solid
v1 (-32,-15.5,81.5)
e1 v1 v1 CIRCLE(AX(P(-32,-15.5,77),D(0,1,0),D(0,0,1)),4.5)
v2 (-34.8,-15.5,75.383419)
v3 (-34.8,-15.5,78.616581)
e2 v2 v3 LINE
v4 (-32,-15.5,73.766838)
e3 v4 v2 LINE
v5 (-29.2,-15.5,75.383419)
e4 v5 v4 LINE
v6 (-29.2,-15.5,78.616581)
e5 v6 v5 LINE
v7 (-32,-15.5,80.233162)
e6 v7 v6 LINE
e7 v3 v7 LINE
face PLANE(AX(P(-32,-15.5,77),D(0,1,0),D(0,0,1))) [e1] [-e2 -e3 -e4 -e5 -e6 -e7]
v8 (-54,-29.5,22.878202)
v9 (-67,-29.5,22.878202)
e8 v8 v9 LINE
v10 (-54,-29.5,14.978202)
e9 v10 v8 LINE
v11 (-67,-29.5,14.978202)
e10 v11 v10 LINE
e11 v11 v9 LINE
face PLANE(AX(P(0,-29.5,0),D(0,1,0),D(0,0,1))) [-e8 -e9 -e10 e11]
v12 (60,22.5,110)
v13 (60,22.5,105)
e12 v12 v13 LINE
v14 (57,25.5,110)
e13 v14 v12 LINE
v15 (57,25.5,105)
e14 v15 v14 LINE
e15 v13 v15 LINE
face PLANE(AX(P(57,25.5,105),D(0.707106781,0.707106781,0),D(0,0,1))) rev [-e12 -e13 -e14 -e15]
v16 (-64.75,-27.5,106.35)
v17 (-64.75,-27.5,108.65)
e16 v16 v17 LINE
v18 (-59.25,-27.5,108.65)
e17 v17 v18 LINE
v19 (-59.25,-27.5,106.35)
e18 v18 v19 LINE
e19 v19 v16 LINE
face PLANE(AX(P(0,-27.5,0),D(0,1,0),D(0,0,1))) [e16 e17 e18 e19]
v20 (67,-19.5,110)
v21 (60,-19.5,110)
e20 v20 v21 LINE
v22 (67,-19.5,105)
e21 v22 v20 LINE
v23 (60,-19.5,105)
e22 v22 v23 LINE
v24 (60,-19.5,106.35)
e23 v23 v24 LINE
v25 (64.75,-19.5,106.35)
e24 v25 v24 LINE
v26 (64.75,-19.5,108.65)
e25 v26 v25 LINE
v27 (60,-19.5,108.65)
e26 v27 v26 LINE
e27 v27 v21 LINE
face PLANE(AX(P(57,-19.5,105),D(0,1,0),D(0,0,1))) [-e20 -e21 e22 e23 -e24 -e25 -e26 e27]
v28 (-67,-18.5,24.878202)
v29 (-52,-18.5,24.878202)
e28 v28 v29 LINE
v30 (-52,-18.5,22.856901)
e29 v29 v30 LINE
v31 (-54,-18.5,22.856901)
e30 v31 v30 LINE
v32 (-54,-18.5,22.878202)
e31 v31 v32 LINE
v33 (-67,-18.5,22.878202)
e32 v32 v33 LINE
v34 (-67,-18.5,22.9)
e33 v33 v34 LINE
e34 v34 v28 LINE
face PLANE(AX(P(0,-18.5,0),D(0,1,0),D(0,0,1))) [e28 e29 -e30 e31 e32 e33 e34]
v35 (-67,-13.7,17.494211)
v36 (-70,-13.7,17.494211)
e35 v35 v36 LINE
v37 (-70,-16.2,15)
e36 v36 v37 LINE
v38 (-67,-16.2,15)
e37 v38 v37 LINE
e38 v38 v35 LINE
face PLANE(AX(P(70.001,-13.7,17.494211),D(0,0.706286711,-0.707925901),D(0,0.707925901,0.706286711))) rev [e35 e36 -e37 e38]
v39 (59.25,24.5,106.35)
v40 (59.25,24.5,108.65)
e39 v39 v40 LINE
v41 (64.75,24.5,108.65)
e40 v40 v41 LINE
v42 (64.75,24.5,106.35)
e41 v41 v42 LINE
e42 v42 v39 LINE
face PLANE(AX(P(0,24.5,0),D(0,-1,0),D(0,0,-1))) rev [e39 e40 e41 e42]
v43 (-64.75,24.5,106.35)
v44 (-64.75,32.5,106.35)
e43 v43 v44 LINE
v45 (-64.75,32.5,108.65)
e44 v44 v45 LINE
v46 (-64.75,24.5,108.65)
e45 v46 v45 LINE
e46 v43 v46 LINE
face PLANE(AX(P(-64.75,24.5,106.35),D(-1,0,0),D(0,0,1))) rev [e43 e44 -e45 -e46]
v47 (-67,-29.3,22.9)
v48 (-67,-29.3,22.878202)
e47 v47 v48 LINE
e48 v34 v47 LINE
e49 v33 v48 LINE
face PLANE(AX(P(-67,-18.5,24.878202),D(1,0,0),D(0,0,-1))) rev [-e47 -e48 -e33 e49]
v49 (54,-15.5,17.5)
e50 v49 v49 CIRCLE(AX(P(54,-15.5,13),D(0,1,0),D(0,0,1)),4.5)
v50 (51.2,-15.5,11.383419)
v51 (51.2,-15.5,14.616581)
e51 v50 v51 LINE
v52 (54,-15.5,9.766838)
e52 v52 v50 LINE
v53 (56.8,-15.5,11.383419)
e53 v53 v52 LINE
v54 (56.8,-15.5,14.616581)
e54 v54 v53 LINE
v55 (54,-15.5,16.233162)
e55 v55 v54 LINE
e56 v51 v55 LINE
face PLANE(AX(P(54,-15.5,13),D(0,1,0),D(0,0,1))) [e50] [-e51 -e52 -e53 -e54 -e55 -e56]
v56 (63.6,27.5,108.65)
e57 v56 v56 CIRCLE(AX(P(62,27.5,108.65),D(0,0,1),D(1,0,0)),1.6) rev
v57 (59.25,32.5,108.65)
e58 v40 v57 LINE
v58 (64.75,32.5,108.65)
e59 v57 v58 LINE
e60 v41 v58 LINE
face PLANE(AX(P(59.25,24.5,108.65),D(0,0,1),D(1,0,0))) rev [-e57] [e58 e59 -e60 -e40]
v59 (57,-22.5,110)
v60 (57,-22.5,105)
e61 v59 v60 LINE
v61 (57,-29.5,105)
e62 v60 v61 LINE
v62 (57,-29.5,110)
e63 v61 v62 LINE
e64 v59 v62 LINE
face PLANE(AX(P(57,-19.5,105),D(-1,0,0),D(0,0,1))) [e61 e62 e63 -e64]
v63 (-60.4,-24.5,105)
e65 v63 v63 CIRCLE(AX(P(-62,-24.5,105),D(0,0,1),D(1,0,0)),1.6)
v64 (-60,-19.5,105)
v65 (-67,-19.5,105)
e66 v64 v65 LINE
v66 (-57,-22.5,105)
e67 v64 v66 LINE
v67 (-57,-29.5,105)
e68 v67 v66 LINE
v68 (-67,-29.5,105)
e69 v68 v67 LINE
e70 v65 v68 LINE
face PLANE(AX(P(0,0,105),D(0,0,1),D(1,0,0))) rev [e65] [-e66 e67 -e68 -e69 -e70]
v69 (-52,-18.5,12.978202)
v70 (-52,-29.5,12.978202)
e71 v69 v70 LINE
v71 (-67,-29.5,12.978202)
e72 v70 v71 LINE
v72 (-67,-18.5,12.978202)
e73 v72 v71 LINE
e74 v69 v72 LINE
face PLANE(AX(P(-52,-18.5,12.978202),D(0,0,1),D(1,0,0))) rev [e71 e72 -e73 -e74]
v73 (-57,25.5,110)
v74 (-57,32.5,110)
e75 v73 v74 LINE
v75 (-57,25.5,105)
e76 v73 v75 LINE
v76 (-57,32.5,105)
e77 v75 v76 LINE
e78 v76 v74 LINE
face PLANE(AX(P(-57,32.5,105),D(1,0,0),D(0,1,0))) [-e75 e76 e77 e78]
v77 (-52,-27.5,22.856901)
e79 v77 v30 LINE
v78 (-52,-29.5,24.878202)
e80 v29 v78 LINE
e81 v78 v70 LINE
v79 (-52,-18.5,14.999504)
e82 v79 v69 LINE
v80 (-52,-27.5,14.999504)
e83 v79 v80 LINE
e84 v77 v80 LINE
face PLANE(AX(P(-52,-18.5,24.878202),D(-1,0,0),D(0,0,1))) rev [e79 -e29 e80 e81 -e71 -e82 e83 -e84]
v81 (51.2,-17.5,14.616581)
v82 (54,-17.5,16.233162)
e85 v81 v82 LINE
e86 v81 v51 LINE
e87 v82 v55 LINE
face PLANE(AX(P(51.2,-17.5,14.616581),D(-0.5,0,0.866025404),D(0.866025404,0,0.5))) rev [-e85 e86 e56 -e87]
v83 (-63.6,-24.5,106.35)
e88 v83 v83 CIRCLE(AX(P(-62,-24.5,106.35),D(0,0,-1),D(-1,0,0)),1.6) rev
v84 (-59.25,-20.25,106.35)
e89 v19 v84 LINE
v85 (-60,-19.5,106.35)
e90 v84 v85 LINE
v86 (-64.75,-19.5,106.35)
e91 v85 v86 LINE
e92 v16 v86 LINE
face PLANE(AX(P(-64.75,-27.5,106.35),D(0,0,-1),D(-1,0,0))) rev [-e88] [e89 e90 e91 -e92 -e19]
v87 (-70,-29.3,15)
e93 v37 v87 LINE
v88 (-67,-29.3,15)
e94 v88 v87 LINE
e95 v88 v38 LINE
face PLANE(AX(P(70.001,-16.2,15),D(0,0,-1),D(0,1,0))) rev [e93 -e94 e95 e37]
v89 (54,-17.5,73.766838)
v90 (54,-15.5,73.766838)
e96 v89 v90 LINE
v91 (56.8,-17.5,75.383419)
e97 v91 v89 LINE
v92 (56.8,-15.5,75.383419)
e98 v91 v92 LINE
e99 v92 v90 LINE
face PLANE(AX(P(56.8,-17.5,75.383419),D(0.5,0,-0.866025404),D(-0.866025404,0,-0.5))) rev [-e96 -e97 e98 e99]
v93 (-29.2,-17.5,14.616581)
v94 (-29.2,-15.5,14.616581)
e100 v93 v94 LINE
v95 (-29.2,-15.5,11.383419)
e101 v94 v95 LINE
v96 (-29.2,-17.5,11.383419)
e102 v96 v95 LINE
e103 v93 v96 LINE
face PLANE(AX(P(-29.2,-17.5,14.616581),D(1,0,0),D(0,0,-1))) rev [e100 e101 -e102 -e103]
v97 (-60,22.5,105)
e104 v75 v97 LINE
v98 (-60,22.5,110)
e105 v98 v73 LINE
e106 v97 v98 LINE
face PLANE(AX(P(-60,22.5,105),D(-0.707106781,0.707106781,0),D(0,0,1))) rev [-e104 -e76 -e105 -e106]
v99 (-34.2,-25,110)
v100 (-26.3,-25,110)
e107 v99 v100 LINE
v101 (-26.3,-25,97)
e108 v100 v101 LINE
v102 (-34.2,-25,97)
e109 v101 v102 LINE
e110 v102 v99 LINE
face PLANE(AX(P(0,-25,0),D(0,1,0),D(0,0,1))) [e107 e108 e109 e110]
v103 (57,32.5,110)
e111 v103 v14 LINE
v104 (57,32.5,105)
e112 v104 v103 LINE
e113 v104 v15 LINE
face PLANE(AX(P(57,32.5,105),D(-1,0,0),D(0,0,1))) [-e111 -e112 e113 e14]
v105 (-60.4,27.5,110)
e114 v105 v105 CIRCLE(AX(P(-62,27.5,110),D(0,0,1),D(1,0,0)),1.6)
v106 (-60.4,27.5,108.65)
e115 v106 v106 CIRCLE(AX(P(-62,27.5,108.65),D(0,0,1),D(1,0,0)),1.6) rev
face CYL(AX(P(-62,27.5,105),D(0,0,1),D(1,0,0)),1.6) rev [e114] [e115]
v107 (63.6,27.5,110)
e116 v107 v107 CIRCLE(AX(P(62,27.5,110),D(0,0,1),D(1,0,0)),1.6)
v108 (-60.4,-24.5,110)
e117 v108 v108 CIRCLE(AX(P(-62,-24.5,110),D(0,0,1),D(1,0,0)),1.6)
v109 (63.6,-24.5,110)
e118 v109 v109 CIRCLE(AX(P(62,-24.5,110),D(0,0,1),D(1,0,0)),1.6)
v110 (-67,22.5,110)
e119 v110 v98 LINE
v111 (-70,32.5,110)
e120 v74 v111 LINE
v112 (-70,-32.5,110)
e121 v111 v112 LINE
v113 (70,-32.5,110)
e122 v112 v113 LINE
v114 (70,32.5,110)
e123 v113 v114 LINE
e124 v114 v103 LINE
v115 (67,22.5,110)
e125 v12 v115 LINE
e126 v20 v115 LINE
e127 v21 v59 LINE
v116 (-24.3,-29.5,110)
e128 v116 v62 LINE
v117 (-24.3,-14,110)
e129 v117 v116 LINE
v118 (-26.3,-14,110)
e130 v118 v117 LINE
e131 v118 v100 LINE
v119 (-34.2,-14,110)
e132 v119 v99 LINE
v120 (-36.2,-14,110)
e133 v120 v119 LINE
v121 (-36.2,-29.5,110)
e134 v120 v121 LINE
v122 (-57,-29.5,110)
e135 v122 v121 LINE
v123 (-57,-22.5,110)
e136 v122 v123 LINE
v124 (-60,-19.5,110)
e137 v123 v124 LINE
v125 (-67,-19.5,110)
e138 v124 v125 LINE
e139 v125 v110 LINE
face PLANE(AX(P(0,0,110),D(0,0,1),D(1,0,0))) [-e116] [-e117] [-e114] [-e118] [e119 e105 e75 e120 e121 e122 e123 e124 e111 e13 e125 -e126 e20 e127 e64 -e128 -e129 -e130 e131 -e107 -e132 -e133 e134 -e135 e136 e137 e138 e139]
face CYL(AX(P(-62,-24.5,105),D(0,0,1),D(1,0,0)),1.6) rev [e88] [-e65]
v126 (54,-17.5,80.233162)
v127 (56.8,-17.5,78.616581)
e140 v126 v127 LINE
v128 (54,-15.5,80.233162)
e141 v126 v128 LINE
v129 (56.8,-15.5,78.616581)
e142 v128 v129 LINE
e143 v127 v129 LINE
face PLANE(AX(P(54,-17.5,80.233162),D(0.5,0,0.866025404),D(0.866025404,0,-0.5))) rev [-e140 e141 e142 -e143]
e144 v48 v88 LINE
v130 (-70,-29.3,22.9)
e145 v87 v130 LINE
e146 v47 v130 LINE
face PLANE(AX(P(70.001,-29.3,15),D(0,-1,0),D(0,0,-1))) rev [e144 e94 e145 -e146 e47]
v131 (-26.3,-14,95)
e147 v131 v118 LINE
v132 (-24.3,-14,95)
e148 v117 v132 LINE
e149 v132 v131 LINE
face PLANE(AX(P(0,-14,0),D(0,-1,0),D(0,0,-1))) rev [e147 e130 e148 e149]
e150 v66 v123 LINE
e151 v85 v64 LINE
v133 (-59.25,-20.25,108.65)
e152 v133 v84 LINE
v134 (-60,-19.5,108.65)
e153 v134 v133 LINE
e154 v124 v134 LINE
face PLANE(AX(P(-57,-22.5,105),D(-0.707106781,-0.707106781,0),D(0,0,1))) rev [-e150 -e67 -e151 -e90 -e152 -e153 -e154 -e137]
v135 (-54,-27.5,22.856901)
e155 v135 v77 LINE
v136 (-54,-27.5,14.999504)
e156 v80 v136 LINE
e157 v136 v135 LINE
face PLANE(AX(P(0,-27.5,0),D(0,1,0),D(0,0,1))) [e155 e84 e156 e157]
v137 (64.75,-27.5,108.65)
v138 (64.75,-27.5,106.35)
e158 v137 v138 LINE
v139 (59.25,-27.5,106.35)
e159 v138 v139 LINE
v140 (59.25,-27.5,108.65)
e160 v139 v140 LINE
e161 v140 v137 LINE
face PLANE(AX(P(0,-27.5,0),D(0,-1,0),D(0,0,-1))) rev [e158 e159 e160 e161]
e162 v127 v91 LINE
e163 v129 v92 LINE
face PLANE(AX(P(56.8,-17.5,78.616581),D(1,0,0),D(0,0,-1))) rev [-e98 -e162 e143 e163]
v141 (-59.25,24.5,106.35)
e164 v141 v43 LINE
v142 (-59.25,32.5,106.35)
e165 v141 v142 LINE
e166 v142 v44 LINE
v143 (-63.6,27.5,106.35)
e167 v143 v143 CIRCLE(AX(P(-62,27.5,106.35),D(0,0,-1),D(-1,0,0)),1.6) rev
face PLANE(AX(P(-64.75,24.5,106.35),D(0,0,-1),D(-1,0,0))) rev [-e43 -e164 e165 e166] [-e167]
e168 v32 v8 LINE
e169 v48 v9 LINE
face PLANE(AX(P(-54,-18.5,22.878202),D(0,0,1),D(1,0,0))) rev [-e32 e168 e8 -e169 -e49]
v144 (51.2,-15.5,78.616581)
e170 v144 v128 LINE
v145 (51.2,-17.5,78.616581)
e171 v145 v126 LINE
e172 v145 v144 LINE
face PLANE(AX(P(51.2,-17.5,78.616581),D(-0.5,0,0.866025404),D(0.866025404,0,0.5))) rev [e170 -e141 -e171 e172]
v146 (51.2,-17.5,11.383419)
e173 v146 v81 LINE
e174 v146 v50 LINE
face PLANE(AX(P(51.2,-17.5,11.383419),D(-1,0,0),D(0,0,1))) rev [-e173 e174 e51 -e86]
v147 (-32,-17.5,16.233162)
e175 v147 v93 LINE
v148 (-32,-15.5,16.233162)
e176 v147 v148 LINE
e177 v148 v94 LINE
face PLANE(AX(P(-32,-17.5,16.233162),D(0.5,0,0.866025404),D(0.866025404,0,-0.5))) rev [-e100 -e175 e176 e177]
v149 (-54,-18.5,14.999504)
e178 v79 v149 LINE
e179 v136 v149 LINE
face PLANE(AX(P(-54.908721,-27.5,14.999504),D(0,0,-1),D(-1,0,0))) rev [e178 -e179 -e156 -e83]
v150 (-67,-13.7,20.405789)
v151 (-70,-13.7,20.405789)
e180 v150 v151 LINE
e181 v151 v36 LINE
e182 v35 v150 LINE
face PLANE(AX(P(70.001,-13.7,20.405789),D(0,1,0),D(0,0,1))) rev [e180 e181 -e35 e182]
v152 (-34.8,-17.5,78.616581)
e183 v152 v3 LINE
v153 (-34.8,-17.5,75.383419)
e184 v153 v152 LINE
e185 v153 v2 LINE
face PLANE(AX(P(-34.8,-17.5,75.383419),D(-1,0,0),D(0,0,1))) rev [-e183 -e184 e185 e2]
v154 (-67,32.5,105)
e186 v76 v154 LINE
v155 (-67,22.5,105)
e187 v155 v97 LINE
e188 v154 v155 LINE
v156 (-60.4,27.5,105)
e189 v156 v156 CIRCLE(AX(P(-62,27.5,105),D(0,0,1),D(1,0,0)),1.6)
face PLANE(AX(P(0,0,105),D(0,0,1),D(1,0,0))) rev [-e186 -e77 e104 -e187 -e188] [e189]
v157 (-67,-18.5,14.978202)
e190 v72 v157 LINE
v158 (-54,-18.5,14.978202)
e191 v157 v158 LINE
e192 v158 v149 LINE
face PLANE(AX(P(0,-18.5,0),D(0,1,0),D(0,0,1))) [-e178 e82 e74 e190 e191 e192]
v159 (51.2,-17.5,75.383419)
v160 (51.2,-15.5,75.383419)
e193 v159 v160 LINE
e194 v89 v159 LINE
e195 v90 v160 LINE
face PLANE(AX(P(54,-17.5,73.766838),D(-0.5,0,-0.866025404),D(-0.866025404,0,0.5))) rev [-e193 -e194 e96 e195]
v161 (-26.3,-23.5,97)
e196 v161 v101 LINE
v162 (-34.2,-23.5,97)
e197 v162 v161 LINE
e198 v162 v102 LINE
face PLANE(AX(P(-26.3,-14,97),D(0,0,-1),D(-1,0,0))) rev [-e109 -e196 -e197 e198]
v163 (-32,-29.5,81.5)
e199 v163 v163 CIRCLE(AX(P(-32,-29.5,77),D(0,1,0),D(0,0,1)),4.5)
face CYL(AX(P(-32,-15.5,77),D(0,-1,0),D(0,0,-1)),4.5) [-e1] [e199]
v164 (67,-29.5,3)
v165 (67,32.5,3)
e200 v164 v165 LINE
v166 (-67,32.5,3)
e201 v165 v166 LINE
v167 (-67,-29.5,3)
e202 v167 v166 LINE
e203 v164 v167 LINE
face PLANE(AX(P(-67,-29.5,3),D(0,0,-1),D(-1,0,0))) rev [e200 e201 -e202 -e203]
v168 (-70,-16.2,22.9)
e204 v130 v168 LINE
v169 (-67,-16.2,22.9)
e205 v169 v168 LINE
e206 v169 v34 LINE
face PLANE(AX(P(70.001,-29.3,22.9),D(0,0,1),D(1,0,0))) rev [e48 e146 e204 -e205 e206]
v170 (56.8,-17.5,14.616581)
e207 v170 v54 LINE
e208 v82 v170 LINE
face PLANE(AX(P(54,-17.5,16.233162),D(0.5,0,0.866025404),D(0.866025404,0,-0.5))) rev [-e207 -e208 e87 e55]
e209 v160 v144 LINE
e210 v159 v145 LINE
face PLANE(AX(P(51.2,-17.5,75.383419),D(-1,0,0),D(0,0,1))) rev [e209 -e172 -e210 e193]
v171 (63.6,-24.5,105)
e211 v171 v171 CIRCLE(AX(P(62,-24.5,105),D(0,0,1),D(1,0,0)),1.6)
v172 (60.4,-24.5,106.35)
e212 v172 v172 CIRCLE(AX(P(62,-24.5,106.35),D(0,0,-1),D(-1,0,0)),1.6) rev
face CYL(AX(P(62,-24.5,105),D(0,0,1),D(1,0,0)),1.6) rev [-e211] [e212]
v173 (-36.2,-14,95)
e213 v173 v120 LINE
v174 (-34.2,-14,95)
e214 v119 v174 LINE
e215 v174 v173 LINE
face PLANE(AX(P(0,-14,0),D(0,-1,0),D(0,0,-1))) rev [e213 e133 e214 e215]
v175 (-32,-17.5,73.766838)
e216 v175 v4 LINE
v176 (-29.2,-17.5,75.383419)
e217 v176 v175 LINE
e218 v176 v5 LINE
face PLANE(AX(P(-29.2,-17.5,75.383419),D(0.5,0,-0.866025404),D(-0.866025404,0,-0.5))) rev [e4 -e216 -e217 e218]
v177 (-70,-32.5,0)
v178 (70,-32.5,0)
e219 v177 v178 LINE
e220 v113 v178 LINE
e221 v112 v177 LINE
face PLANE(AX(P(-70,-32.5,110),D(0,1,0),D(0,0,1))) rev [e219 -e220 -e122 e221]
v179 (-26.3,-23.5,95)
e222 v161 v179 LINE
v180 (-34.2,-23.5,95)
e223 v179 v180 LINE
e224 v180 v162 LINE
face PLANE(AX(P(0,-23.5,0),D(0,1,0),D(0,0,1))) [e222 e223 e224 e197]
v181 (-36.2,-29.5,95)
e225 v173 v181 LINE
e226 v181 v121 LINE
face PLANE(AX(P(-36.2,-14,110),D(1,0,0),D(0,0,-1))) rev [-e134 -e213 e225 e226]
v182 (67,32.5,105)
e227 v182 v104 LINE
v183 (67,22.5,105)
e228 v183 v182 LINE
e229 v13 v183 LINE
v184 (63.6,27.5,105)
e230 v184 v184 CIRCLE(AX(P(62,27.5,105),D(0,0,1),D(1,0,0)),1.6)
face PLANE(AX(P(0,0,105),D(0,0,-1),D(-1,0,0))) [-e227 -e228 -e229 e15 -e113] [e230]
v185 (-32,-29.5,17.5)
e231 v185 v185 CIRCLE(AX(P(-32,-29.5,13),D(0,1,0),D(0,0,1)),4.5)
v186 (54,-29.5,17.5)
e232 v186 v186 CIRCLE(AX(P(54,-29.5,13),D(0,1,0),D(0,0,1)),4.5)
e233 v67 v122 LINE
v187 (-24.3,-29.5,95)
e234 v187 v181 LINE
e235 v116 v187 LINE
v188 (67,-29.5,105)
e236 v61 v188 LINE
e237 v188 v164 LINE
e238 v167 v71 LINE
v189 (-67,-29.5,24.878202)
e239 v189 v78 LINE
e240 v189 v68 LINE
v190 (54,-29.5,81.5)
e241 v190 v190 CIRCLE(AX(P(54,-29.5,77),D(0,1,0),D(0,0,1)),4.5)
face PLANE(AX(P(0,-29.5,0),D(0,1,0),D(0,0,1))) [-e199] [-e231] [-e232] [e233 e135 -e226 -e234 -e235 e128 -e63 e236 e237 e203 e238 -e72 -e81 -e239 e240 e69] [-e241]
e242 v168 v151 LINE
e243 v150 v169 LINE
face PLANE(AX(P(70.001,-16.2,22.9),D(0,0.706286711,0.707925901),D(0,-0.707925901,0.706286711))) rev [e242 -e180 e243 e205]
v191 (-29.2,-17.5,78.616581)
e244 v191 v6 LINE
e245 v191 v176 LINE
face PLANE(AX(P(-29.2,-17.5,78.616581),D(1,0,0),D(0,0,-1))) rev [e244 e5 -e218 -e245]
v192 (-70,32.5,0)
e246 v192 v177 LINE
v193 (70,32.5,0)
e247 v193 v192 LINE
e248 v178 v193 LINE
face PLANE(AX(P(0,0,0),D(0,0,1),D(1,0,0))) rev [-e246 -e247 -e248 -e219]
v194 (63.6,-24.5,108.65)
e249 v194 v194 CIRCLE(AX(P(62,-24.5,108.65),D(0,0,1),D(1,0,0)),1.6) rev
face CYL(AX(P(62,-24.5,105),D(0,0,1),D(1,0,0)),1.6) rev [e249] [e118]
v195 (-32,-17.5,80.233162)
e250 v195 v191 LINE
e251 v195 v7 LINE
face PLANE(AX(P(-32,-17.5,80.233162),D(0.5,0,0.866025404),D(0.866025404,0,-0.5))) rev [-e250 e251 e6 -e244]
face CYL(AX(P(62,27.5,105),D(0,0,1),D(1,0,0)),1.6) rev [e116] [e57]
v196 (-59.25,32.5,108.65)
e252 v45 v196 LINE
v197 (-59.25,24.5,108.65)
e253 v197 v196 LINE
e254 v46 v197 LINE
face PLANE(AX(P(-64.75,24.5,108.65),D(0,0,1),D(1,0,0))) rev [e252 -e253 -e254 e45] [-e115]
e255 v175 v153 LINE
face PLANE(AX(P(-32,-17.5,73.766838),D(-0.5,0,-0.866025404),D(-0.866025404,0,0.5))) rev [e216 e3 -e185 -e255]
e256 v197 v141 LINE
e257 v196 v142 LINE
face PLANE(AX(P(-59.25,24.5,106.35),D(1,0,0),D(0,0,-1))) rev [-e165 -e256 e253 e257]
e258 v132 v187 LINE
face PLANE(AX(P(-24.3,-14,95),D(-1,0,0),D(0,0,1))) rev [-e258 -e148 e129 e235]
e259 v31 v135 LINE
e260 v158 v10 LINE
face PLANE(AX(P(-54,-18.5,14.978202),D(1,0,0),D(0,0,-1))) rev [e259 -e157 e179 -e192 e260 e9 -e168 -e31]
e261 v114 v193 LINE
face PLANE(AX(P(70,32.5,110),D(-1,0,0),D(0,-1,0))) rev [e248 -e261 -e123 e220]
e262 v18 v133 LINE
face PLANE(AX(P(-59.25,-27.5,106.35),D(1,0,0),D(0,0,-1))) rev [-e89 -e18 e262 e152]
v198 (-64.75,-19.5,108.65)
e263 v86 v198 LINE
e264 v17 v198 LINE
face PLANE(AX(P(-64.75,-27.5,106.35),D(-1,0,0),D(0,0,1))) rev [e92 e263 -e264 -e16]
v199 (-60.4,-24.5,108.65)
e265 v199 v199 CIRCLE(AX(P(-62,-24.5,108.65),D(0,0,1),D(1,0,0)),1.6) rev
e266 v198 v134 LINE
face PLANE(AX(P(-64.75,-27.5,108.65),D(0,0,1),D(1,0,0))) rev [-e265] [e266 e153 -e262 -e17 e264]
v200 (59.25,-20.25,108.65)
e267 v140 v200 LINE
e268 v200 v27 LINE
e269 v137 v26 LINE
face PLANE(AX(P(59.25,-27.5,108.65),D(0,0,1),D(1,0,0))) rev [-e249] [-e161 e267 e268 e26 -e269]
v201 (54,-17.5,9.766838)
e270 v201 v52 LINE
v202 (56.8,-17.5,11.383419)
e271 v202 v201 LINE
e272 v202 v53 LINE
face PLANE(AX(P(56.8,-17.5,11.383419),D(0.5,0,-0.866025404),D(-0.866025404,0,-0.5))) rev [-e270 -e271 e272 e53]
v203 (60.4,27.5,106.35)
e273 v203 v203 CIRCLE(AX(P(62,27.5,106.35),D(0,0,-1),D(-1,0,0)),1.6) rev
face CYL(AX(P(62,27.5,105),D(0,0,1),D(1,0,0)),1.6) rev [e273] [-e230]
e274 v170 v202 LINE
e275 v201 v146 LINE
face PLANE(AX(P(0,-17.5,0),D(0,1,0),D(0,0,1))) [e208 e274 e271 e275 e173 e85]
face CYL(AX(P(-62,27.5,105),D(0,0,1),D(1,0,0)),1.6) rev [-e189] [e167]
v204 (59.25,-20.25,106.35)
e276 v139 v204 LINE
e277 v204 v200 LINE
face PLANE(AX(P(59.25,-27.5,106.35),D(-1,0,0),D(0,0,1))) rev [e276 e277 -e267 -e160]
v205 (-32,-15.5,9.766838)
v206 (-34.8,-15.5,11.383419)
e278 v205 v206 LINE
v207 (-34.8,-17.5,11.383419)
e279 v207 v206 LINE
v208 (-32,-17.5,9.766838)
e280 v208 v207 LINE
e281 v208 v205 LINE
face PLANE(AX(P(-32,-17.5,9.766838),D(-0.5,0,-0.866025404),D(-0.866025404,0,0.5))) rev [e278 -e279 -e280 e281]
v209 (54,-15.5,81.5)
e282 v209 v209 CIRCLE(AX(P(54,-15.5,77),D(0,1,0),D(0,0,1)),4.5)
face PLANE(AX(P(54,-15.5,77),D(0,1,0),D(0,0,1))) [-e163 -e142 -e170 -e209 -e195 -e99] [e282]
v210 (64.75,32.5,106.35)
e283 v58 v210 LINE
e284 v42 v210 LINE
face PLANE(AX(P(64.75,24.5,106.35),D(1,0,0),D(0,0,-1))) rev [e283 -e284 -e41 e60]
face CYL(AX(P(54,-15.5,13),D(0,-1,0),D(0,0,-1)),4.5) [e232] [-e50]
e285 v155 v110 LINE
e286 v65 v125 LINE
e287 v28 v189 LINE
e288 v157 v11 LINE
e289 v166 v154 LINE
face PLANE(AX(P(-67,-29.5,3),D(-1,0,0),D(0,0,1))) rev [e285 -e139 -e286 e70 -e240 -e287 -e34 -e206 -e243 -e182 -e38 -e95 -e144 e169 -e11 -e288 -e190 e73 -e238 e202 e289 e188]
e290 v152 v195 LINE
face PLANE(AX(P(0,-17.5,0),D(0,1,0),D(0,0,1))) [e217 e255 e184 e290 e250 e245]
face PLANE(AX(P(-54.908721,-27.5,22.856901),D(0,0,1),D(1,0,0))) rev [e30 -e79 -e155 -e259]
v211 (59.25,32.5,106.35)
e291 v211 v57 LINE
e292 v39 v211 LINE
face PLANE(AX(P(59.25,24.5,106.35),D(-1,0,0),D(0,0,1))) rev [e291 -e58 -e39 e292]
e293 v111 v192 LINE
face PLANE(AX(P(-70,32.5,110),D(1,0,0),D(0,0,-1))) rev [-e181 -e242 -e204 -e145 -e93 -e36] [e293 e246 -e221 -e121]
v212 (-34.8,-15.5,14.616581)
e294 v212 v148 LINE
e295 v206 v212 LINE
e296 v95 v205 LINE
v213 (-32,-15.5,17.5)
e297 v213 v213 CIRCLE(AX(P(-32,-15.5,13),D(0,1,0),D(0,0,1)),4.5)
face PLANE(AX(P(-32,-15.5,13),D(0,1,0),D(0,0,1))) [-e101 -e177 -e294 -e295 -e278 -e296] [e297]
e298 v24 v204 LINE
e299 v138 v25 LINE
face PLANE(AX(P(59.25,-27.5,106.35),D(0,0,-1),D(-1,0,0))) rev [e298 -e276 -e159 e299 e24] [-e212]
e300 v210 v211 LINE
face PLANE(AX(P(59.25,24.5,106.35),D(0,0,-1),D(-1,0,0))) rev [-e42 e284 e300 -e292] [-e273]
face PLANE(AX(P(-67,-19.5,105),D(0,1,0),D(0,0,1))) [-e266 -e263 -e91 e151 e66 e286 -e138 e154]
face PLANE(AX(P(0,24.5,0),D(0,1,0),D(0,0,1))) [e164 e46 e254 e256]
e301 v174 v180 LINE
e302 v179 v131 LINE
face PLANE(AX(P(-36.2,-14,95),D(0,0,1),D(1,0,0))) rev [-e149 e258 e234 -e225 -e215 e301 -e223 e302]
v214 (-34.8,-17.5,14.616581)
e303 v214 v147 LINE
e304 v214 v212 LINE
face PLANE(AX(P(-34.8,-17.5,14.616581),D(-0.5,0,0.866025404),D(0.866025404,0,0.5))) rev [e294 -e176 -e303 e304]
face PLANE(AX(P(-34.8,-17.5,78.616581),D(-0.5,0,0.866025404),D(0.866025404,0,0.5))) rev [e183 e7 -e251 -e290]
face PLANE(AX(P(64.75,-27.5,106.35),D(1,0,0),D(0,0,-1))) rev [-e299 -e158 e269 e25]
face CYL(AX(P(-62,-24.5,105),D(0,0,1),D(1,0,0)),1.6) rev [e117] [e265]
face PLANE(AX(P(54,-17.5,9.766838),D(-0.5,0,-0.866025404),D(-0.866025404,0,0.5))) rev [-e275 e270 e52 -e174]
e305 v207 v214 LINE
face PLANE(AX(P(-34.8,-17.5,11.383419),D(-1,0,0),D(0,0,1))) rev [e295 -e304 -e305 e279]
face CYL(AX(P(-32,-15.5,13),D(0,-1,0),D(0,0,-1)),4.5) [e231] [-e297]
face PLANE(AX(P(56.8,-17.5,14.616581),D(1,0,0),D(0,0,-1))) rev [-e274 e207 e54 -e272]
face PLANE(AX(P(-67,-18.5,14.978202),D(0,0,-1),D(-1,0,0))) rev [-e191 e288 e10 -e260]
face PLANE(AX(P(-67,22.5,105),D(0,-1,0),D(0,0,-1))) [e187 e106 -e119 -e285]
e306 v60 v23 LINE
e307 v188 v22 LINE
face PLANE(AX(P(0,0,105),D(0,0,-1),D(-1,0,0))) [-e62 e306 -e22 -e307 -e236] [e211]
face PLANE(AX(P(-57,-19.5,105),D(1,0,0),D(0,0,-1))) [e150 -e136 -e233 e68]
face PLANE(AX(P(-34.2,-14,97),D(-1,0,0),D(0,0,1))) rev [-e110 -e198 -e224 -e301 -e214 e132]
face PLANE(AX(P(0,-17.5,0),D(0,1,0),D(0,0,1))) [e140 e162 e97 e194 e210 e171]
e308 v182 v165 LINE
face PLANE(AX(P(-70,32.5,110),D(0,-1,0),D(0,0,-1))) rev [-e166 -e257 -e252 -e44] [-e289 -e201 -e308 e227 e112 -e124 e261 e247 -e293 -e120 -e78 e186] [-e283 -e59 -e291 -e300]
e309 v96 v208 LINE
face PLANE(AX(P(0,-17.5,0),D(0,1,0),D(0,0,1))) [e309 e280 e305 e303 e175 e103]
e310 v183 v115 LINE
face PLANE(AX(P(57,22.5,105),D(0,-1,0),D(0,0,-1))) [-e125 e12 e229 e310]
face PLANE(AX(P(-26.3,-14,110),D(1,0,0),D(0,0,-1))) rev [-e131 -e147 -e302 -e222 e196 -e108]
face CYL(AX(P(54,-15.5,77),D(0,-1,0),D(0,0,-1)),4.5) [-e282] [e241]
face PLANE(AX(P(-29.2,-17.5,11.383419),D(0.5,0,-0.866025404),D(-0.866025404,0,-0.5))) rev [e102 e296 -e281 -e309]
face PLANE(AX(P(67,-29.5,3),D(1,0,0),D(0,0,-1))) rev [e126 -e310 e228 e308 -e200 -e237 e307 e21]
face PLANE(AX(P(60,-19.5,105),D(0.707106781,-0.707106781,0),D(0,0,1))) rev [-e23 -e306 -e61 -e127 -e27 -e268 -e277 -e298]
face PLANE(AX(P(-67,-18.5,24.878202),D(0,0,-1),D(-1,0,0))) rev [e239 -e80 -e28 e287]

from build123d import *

# Parameters (mm, degrees)
SKETCH_2_W          = 140
SKETCH_2_H          = 65
EXTRUDE_1_DEPTH     = 110
SKETCH_3_W          = 134
SKETCH_3_H          = 107
CUT_EXTRUDE_1_DEPTH = 62
SKETCH_4_W          = 10
SKETCH_4_H          = 10
SKETCH_4_R          = 1.6
EXTRUDE_2_DEPTH     = 5
SKETCH_5_W          = 10
SKETCH_5_H          = 10
SKETCH_5_R          = 1.6
EXTRUDE_3_DEPTH     = 5
SKETCH_6_W          = 5.5
SKETCH_6_H          = 2.3
CUT_EXTRUDE_2_DEPTH = 8
SKETCH_8_W          = 5.5
SKETCH_8_H          = 2.3
CUT_EXTRUDE_3_DEPTH = 8
CHAMFER_1_SIZE      = 3
SKETCH_9_R          = 4.5
EXTRUDE_4_DEPTH     = 14
CUT_EXTRUDE_4_DEPTH = 2
CUT_EXTRUDE_5_REACH = 182.987
EXTRUDE_5_DEPTH     = 11
SKETCH_16_W         = 5.817441426
SKETCH_16_H         = 7.857396667
CUT_EXTRUDE_6_DEPTH = 9
EXTRUDE_6_DEPTH     = 15.5
SKETCH_18_W         = 7.9
SKETCH_18_H         = 11.370001712
CUT_EXTRUDE_7_DEPTH = 9.5
SKETCH_19_W         = 7.9
SKETCH_19_H         = 13
EXTRUDE_7_DEPTH     = 4.5


with BuildPart() as part:
    # Эскиз2 → Бобышка-Вытянуть1 (new body)
    with BuildSketch(Plane.XY):
        Rectangle(SKETCH_2_W, SKETCH_2_H)
    extrude(amount=EXTRUDE_1_DEPTH)

    # Эскиз3 → Вырез-Вытянуть1 (cut)
    with BuildSketch(Plane(origin=(0, 32.5, 0), x_dir=(1, 0, 0), z_dir=(0, 1, 0))):
        with Locations((0, -56.5)):
            Rectangle(SKETCH_3_W, SKETCH_3_H)
    extrude(amount=-CUT_EXTRUDE_1_DEPTH, mode=Mode.SUBTRACT)

    # Эскиз4 → Бобышка-Вытянуть2 (add)
    # profile 1 of 2: a face of its own
    with BuildSketch(Plane.XY.offset(110)):
        with Locations((62, -24.5)):
            Rectangle(SKETCH_4_W, SKETCH_4_H)
        with Locations((62, -24.5)):
            Circle(SKETCH_4_R, mode=Mode.SUBTRACT)
    # profile 2 of 2: a face of its own
    with BuildSketch(Plane.XY.offset(110)):
        with Locations((-62, -24.5)):
            Rectangle(SKETCH_4_W, SKETCH_4_H)
        with Locations((-62, -24.5)):
            Circle(SKETCH_4_R, mode=Mode.SUBTRACT)
    extrude(amount=-EXTRUDE_2_DEPTH)

    # Эскиз5 → Бобышка-Вытянуть3 (add)
    # profile 1 of 2: a face of its own
    with BuildSketch(Plane.XY.offset(110)):
        with Locations((62, 27.5)):
            Rectangle(SKETCH_5_W, SKETCH_5_H)
        with Locations((62, 27.5)):
            Circle(SKETCH_5_R, mode=Mode.SUBTRACT)
    # profile 2 of 2: a face of its own
    with BuildSketch(Plane.XY.offset(110)):
        with Locations((-62, 27.5)):
            Rectangle(SKETCH_5_W, SKETCH_5_H)
        with Locations((-62, 27.5)):
            Circle(SKETCH_5_R, mode=Mode.SUBTRACT)
    extrude(amount=-EXTRUDE_3_DEPTH)

    # Эскиз6 → Вырез-Вытянуть2 (cut)
    with BuildSketch(Plane(origin=(0, 32.5, 0), x_dir=(1, 0, 0), z_dir=(0, 1, 0))):
        with Locations((-62, -107.5)):
            Rectangle(SKETCH_6_W, SKETCH_6_H)
        with Locations((62, -107.5)):
            Rectangle(SKETCH_6_W, SKETCH_6_H)
    extrude(amount=-CUT_EXTRUDE_2_DEPTH, mode=Mode.SUBTRACT)

    # Эскиз8 → Вырез-Вытянуть3 (cut)
    with BuildSketch(Plane(origin=(0, -19.5, 0), x_dir=(1, 0, 0), z_dir=(0, 1, 0))):
        with Locations((62, -107.5)):
            Rectangle(SKETCH_8_W, SKETCH_8_H)
        with Locations((-62, -107.5)):
            Rectangle(SKETCH_8_W, SKETCH_8_H)
    extrude(amount=-CUT_EXTRUDE_3_DEPTH, mode=Mode.SUBTRACT)

    # Фаска1
    # the kernel refuses this chamfer: 3 mm, written as the material it takes off along each edge
    with BuildSketch(Plane(origin=(57, 22.5, 117.715048964), x_dir=(-0.027495876610586768, 0.9996219169112968, 0), z_dir=(0, 0, -1))) as chamfer_1_piece_1:
        Polygon((CHAMFER_1_SIZE * 0.999621916911, CHAMFER_1_SIZE * 0.0274958766106), (-CHAMFER_1_SIZE * 0.0274958766106, CHAMFER_1_SIZE * 0.999621916911), (0, 0), align=None)
    extrude(amount=20.430097928, mode=Mode.SUBTRACT)
    with BuildSketch(Plane(origin=(57, -19.5, 117.715048964), x_dir=(-0.027495876610586768, -0.9996219169112968, 0), z_dir=(0, 0, -1)), Plane(origin=(-57, 22.5, 117.715048964), x_dir=(0.027495876610586733, 0.9996219169112968, 0), z_dir=(0, 0, -1)), Plane(origin=(-57, -19.5, 117.715048964), x_dir=(-0.9996219169112965, 0.02749587661058676, 0), z_dir=(0, 0, -1))) as chamfer_1_piece_2:
        Polygon((CHAMFER_1_SIZE * 0.999621916911, -CHAMFER_1_SIZE * 0.0274958766106), (-CHAMFER_1_SIZE * 0.0274958766106, -CHAMFER_1_SIZE * 0.999621916911), (0, 0), align=None)
    extrude(amount=20.430097928, mode=Mode.SUBTRACT)

    # Эскиз9 → Бобышка-Вытянуть4 (add)
    with BuildSketch(Plane(origin=(0, -29.5, 0), x_dir=(1, 0, 0), z_dir=(0, 1, 0))):
        with Locations(Location((54, -13, 0), (0, 0, 270))):
            Circle(SKETCH_9_R)
        with Locations(Location((-32, -13, 0), (0, 0, 270))):
            Circle(SKETCH_9_R)
        with Locations(Location((-32, -77, 0), (0, 0, 270))):
            Circle(SKETCH_9_R)
        with Locations(Location((54, -77, 0), (0, 0, 270))):
            Circle(SKETCH_9_R)
    extrude(amount=EXTRUDE_4_DEPTH)

    # Эскиз12 → Вырез-Вытянуть4 (cut)
    with BuildSketch(Plane(origin=(0, -15.5, 0), x_dir=(1, 0, 0), z_dir=(0, 1, 0))):
        Polygon((54, -9.766838493), (51.2, -11.383419246), (51.2, -14.616580754), (54, -16.233161507), (56.8, -14.616580754), (56.8, -11.383419246), align=None)
        Polygon((-32, -9.766838493), (-34.8, -11.383419246), (-34.8, -14.616580754), (-32, -16.233161507), (-29.2, -14.616580754), (-29.2, -11.383419246), align=None)
        Polygon((54, -73.766838493), (51.2, -75.383419246), (51.2, -78.616580754), (54, -80.233161507), (56.8, -78.616580754), (56.8, -75.383419246), align=None)
        Polygon((-32, -73.766838493), (-34.8, -75.383419246), (-34.8, -78.616580754), (-32, -80.233161507), (-29.2, -78.616580754), (-29.2, -75.383419246), align=None)
    extrude(amount=-CUT_EXTRUDE_4_DEPTH, mode=Mode.SUBTRACT)

    # Эскиз13 → Вырез-Вытянуть5 (cut, up to next)
    with BuildSketch(Plane.ZY.offset(70), mode=Mode.PRIVATE) as cut_extrude_5_sk1:
        Polygon((15, -29.3), (22.9, -29.3), (22.9, -16.2), (20.405788704, -13.7), (17.494211296, -13.7), (15, -16.2), align=None)
    cut_extrude_5_tool1 = extrude(cut_extrude_5_sk1.sketch, amount=-CUT_EXTRUDE_5_REACH, mode=Mode.PRIVATE) & part.part
    add(cut_extrude_5_tool1.solids().sort_by_distance((-70, -21.871275, 18.95))[0], mode=Mode.SUBTRACT)

    # Эскиз15 → Бобышка-Вытянуть5 (add)
    with BuildSketch(Plane(origin=(0, -29.5, 0), x_dir=(1, 0, 0), z_dir=(0, 1, 0))):
        Polygon((-67, -24.878202282), (-52, -24.878202282), (-52, -12.978202282), (-67, -12.978202282), (-67, -14.978202282), (-54, -14.978202282), (-54, -22.878202282), (-67, -22.878202282), align=None)
    extrude(amount=EXTRUDE_5_DEPTH)

    # Эскиз16 → Вырез-Вытянуть6 (cut)
    with BuildSketch(Plane(origin=(0, -18.5, 0), x_dir=(1, 0, 0), z_dir=(0, 1, 0))):
        with Locations((-52, -18.928202283)):
            Rectangle(SKETCH_16_W, SKETCH_16_H)
    extrude(amount=-CUT_EXTRUDE_6_DEPTH, mode=Mode.SUBTRACT)

    # Эскиз17 → Бобышка-Вытянуть6 (add)
    with BuildSketch(Plane(origin=(0, -29.5, 0), x_dir=(1, 0, 0), z_dir=(0, 1, 0))):
        Polygon((-36.2, -110), (-36.2, -95), (-24.3, -95), (-24.3, -110), (-26.3, -110), (-26.3, -97), (-34.2, -97), (-34.2, -110), align=None)
    extrude(amount=EXTRUDE_6_DEPTH)

    # Эскиз18 → Вырез-Вытянуть7 (cut)
    with BuildSketch(Plane(origin=(0, -14, 0), x_dir=(1, 0, 0), z_dir=(0, 1, 0))):
        with Locations((-30.25, -95)):
            Rectangle(SKETCH_18_W, SKETCH_18_H)
    extrude(amount=-CUT_EXTRUDE_7_DEPTH, mode=Mode.SUBTRACT)

    # Эскиз19 → Бобышка-Вытянуть7 (add)
    with BuildSketch(Plane(origin=(0, -29.5, 0), x_dir=(1, 0, 0), z_dir=(0, 1, 0))):
        with Locations((-30.25, -103.5)):
            Rectangle(SKETCH_19_W, SKETCH_19_H)
    extrude(amount=EXTRUDE_7_DEPTH)


solid = part.part
